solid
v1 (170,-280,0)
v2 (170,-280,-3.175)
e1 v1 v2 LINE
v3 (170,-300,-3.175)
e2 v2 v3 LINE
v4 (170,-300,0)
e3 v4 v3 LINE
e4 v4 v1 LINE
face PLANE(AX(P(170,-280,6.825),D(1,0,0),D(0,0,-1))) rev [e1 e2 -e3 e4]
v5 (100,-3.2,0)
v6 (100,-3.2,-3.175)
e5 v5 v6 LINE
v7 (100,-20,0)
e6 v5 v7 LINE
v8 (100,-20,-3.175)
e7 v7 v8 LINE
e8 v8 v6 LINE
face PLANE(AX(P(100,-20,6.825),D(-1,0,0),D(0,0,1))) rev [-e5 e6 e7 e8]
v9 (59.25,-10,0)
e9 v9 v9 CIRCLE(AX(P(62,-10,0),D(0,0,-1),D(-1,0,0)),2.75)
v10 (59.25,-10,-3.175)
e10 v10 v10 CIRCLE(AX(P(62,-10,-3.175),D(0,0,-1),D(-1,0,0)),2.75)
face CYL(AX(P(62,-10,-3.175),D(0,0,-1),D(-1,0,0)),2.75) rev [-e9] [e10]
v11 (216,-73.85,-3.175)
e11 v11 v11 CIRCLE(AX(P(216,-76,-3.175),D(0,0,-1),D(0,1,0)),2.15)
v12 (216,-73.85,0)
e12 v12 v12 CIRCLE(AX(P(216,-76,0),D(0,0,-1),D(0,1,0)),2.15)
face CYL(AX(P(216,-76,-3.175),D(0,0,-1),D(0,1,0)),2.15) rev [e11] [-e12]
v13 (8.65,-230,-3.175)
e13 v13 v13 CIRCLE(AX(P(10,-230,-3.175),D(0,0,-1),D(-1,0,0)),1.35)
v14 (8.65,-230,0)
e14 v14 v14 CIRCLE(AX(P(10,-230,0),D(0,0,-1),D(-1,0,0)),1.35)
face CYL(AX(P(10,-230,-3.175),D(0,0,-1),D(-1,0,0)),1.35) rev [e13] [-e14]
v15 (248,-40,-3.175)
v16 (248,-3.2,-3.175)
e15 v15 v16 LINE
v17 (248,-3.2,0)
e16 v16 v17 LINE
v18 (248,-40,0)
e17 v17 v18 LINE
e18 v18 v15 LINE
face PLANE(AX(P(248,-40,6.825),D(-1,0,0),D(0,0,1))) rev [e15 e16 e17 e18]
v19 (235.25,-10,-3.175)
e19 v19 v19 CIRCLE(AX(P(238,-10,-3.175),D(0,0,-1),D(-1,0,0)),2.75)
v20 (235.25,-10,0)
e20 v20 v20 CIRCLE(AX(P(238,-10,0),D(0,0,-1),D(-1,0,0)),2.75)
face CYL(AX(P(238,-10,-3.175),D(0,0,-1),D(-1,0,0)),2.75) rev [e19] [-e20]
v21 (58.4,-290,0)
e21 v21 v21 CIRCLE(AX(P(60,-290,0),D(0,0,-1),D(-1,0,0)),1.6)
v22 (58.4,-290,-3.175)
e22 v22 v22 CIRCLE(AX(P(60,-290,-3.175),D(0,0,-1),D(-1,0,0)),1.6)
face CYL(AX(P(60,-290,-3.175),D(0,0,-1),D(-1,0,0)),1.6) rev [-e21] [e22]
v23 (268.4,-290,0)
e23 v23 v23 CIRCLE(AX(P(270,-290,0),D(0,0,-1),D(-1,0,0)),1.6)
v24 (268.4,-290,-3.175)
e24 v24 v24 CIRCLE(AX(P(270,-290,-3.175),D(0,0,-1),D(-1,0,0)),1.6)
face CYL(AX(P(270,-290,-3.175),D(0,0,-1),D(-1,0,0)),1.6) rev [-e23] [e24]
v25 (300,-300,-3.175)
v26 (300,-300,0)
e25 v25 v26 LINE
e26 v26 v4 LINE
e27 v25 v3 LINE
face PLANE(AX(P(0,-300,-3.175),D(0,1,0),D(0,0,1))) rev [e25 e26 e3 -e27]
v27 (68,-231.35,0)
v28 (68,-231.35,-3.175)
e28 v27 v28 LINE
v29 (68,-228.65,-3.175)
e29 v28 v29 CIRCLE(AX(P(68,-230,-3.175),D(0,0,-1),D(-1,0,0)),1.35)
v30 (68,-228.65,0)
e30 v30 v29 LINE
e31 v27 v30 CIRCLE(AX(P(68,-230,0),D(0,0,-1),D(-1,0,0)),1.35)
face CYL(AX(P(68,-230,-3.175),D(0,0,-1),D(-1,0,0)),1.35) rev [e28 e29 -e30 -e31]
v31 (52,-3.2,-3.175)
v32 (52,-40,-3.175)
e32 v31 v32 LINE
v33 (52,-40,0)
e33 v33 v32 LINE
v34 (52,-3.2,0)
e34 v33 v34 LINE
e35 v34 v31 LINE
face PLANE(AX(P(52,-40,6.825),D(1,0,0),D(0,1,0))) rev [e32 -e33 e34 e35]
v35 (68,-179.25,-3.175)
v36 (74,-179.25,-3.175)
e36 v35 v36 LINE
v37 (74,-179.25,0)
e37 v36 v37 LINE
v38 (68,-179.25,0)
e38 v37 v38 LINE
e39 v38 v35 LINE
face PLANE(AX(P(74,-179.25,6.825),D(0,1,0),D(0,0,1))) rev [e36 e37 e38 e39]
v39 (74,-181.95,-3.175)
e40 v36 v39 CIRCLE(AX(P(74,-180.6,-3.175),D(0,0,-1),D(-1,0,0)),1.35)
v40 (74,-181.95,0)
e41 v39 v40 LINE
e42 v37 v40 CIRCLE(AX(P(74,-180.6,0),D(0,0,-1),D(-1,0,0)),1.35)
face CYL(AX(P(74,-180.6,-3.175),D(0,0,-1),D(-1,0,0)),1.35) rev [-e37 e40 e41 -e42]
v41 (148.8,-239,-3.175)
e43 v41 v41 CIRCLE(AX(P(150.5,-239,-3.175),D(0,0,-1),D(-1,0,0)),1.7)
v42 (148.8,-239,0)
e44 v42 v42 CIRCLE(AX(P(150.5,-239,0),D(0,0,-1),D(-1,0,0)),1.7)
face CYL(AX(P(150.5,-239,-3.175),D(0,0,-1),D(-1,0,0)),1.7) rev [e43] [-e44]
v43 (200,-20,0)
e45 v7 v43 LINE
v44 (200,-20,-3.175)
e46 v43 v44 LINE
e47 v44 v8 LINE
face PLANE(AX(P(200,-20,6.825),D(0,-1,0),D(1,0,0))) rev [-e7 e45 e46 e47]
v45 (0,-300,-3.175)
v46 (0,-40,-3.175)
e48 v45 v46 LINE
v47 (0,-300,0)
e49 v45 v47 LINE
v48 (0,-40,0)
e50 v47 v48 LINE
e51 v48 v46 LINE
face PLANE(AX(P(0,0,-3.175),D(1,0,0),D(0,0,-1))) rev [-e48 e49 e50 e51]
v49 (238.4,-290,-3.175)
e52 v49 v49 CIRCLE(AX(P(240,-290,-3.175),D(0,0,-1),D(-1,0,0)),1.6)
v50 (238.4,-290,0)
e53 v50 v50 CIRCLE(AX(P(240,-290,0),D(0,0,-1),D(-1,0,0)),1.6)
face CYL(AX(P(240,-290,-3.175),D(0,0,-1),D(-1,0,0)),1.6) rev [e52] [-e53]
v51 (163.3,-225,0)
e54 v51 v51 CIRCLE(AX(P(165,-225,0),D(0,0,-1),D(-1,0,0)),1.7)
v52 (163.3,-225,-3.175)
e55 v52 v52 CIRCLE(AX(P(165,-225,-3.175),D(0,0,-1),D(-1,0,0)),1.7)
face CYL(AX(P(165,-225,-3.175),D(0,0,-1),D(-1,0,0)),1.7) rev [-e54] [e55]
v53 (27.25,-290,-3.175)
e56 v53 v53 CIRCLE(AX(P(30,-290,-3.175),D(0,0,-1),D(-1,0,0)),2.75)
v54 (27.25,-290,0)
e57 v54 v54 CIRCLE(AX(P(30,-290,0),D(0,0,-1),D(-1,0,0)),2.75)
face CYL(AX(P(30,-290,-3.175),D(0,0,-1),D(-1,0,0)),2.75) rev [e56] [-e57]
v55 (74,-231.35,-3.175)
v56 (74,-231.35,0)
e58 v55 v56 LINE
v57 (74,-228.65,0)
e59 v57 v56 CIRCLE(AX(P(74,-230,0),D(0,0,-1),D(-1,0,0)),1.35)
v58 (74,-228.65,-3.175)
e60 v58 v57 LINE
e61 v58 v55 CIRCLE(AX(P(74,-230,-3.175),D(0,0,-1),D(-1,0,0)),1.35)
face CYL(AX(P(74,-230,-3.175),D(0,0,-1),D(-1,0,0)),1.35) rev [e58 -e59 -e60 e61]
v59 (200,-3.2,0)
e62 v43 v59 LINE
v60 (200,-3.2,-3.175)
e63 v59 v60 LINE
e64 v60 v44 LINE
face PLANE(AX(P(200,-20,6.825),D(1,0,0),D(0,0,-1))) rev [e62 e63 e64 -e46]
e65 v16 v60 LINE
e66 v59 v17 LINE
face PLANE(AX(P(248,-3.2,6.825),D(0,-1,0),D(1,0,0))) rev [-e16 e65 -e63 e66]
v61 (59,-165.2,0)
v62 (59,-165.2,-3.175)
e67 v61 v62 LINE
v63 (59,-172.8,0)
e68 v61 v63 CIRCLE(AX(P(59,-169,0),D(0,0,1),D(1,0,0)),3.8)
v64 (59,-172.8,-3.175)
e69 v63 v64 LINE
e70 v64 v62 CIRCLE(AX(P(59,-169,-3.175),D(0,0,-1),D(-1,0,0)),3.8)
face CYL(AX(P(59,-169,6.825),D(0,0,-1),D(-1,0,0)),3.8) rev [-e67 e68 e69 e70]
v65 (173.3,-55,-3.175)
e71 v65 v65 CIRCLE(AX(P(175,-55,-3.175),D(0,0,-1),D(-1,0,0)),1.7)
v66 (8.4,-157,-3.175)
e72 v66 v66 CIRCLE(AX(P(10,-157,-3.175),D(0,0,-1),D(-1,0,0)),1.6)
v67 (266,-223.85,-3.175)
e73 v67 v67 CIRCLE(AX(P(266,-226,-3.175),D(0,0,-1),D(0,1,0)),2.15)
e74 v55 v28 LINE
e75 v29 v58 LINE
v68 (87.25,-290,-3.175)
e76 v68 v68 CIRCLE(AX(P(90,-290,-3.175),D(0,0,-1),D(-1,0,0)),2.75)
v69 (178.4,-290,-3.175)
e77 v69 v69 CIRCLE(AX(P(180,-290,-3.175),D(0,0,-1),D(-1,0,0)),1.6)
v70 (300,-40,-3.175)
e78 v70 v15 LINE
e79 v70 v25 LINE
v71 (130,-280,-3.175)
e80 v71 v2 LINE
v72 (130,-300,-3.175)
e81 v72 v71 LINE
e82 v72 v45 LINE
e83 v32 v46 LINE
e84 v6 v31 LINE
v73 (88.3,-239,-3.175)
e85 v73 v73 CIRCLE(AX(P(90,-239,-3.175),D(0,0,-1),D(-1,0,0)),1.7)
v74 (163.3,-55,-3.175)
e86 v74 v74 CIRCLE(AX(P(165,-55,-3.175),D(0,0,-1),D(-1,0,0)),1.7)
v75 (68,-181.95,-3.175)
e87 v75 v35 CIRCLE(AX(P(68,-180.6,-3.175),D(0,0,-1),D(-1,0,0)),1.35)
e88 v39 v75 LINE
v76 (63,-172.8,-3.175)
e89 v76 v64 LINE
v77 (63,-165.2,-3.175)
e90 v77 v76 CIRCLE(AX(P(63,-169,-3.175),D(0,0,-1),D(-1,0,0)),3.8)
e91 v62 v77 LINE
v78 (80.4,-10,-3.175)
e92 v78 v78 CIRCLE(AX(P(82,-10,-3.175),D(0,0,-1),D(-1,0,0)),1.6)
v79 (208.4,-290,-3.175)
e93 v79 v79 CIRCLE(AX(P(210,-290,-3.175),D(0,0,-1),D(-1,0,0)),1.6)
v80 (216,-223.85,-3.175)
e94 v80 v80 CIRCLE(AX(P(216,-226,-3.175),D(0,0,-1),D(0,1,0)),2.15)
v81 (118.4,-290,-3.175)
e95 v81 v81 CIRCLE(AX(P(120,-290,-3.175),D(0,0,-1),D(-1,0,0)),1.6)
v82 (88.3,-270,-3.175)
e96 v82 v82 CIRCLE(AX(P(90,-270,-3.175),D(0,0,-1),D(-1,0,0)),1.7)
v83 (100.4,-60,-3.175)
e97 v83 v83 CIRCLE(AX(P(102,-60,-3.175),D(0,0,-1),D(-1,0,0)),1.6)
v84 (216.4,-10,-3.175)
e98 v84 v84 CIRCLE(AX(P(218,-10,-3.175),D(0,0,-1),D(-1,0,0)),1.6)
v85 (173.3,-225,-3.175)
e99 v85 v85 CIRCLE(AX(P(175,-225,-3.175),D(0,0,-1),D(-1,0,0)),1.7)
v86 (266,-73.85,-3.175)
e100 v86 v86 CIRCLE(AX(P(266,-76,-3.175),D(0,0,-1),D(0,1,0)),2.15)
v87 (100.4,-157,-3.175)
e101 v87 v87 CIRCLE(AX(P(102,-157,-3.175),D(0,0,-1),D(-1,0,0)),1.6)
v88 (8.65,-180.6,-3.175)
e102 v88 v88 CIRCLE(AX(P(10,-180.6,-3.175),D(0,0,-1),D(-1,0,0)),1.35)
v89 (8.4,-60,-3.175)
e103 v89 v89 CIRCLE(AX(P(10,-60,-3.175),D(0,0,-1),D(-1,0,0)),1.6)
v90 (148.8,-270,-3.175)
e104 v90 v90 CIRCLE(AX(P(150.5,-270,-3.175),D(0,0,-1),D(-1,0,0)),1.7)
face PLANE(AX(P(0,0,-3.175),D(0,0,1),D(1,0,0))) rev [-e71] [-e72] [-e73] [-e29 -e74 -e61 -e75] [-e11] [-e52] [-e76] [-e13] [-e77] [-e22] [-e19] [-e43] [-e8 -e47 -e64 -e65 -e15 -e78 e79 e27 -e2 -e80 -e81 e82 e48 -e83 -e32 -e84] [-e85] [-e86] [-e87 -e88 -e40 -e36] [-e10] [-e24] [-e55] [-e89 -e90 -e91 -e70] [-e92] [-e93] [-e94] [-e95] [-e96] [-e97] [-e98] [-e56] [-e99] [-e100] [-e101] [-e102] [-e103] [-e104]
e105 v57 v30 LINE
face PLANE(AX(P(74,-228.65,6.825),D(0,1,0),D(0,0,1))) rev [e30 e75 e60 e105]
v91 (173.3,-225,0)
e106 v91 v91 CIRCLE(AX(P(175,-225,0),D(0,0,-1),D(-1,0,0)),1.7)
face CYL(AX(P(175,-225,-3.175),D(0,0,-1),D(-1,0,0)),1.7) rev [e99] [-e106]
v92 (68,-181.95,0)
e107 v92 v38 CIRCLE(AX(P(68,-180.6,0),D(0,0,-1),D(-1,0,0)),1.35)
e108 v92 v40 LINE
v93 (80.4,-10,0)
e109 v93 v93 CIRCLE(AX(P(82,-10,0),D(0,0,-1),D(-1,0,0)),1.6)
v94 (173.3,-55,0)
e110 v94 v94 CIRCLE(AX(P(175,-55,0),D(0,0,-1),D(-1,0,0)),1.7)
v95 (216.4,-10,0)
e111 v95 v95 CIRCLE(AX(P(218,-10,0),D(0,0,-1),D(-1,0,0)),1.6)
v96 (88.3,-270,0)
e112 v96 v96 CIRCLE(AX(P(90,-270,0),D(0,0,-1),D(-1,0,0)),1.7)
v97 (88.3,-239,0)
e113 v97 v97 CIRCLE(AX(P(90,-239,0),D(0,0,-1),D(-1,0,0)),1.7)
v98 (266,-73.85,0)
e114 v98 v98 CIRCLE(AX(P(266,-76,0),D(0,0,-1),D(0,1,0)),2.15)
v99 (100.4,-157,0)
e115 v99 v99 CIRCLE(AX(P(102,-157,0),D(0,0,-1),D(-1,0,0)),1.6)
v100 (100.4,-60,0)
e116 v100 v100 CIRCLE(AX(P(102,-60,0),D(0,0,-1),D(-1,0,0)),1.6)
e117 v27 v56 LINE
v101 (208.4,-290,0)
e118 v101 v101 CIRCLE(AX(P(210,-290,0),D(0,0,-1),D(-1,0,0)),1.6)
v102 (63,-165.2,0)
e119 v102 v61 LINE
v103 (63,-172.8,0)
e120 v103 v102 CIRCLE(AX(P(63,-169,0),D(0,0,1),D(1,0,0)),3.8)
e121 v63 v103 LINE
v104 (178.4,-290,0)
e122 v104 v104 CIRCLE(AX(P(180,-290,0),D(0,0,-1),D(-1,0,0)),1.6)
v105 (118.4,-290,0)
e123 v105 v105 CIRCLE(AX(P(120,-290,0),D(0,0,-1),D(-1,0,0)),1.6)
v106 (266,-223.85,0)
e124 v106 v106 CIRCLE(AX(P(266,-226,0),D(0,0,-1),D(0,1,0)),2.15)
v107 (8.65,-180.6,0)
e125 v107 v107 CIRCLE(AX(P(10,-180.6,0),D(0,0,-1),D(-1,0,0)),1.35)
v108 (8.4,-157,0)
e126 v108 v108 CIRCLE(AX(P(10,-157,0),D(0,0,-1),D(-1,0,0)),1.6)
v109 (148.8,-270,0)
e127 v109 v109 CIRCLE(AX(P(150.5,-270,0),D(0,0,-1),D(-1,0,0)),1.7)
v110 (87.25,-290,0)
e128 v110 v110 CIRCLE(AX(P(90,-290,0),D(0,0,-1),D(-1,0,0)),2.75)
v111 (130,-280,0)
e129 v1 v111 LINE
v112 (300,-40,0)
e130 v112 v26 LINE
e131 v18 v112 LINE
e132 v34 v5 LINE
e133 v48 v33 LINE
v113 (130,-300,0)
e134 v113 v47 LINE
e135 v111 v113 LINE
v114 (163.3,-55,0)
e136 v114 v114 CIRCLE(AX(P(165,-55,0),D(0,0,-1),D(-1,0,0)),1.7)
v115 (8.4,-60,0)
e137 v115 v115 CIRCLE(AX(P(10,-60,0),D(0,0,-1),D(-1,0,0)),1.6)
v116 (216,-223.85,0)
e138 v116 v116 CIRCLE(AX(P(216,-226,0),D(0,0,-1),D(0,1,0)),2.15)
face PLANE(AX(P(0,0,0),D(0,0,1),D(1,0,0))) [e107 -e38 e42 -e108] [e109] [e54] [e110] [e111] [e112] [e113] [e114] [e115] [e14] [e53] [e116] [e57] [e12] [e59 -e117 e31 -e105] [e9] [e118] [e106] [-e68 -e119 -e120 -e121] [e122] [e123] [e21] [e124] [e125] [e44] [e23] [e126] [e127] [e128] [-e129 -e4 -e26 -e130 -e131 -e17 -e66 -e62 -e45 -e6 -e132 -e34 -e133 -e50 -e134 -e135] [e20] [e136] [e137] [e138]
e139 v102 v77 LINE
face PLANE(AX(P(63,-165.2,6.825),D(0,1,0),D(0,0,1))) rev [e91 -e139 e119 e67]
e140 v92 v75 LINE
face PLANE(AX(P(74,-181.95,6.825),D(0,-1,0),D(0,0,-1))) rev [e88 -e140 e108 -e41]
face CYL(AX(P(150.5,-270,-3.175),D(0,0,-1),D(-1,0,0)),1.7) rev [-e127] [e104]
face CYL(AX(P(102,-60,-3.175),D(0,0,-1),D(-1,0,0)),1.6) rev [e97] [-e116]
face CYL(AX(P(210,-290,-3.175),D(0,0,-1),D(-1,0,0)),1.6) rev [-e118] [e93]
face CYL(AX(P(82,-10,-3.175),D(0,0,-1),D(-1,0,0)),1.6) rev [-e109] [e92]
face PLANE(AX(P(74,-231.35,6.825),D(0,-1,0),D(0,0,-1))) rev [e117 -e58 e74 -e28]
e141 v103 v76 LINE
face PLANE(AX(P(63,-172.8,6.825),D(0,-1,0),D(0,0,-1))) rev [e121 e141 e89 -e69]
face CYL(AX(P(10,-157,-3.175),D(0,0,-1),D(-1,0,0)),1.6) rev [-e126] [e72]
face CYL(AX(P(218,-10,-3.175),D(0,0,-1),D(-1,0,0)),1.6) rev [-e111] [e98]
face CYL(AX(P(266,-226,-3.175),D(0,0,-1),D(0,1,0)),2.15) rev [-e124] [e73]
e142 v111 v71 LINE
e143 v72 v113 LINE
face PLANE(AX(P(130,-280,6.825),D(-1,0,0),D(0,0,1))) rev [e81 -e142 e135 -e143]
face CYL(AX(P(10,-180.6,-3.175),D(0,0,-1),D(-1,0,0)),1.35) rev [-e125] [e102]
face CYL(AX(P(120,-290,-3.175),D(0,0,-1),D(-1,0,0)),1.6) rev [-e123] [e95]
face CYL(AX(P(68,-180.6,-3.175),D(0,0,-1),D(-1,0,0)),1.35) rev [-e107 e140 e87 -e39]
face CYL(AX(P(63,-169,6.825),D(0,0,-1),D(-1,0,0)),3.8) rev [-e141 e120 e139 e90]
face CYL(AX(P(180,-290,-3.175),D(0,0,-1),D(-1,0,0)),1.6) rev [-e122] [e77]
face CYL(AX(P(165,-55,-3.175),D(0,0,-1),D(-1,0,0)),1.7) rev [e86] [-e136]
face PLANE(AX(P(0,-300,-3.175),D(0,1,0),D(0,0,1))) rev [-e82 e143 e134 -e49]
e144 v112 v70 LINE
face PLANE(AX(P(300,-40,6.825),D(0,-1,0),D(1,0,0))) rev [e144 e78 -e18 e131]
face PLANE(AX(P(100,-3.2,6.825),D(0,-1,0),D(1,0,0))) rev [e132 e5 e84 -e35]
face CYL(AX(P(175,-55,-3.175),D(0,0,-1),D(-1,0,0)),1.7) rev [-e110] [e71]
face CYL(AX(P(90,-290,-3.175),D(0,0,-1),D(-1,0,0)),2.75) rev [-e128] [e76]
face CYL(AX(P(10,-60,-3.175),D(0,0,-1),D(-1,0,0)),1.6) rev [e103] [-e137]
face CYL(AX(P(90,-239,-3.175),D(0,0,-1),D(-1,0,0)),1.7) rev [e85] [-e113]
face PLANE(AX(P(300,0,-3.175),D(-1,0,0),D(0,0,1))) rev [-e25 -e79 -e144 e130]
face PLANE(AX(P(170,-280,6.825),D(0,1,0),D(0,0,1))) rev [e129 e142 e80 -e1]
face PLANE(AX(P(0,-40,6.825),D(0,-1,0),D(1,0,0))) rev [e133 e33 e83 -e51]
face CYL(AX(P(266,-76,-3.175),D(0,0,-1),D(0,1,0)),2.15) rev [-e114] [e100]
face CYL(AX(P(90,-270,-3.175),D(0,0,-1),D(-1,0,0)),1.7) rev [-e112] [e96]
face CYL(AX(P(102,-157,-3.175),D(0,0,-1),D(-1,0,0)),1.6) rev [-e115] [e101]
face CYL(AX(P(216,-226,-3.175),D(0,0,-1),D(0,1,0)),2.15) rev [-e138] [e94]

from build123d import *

# Parameters (mm, degrees)
SKETCH1_W                    = 300
SKETCH1_H                    = 300
BOSS_EXTRUDE1_DEPTH          = 3.175
SKETCH2_W                    = 52
SKETCH2_H                    = 40
CUT_EXTRUDE1_DEPTH           = 10
M4_START                     = -3.175
M4_CLEARANCE_HOLE1_OUTLINE_R = 2.15
M4_CLEARANCE_HOLE1_DEPTH     = 3.175
M3_CLEARANCE_HOLE2_D         = 3.2
M2_5_CLEARANCE_HOLE1_D       = 2.7
M3_CLEARANCE_HOLE3_D         = 3.2
M3_CLEARANCE_HOLE4_D         = 3.2
CUT_EXTRUDE3_DEPTH           = 10
CUT_EXTRUDE4_DEPTH           = 10
SKETCH15_W                   = 40
SKETCH15_H                   = 20
CUT_EXTRUDE5_DEPTH           = 10
CUT_EXTRUDE6_START           = -10
CUT_EXTRUDE6_DEPTH           = 10
M3_CLEARANCE_HOLE5_D         = 3.4
M5_CLEARANCE_HOLE1_D         = 5.5
M3_CLEARANCE_HOLE7_D         = 3.4


# Read off the part's stored shape, not the designer's step: M4 Clearance Hole1
with BuildPart() as part:
    # Sketch1 → Boss-Extrude1 (new body)
    with BuildSketch(Plane(origin=(0, 0, 0), x_dir=(1, 0, 0), z_dir=(0, 0, -1))):
        with Locations((150, 150)):
            Rectangle(SKETCH1_W, SKETCH1_H)
    extrude(amount=BOSS_EXTRUDE1_DEPTH)

    # Sketch2 → Cut-Extrude1 (cut)
    with BuildSketch(Plane(origin=(0, 0, -3.175), x_dir=(1, 0, 0), z_dir=(0, 0, -1))):
        with Locations((26, 20)):
            Rectangle(SKETCH2_W, SKETCH2_H)
        with Locations((274, 20)):
            Rectangle(SKETCH2_W, SKETCH2_H)
    extrude(amount=-CUT_EXTRUDE1_DEPTH, mode=Mode.SUBTRACT)

    # M4 Clearance Hole1 outline → M4 Clearance Hole1 (cut)
    with BuildSketch(Plane.XY.offset(M4_START)):
        with Locations((266, -226)):
            Circle(M4_CLEARANCE_HOLE1_OUTLINE_R)
        with Locations((216, -76)):
            Circle(M4_CLEARANCE_HOLE1_OUTLINE_R)
        with Locations((216, -226)):
            Circle(M4_CLEARANCE_HOLE1_OUTLINE_R)
        with Locations((266, -76)):
            Circle(M4_CLEARANCE_HOLE1_OUTLINE_R)
    extrude(amount=M4_CLEARANCE_HOLE1_DEPTH, mode=Mode.SUBTRACT)

    # M3 Clearance Hole2 (through all)
    with Locations(Plane(origin=(0, 0, -3.175), x_dir=(-1, 0, 0), z_dir=(0, 0, -1))):
        with Locations((-102, -60), (-10, -157), (-102, -157), (-10, -60)):
            Hole(M3_CLEARANCE_HOLE2_D / 2)

    # M2.5 Clearance Hole1 (through all)
    with Locations(Plane(origin=(0, 0, -3.175), x_dir=(-1, 0, 0), z_dir=(0, 0, -1))):
        with Locations((-74, -180.6), (-10, -230), (-74, -230), (-10, -180.6), (-68, -230), (-68, -180.6)):
            Hole(M2_5_CLEARANCE_HOLE1_D / 2)

    # M3 Clearance Hole3 (through all)
    with Locations(Plane(origin=(0, 0, -3.175), x_dir=(-1, 0, 0), z_dir=(0, 0, -1))):
        with Locations((-30, -290), (-270, -290), (-240, -290), (-210, -290), (-180, -290), (-150, -290), (-120, -290), (-90, -290), (-60, -290)):
            Hole(M3_CLEARANCE_HOLE3_D / 2)

    # M3 Clearance Hole4 (through all)
    with Locations(Plane(origin=(0, 0, -3.175), x_dir=(-1, 0, 0), z_dir=(0, 0, -1))):
        with Locations((-82, -10), (-238, -10), (-150, -10), (-62, -10), (-218, -10)):
            Hole(M3_CLEARANCE_HOLE4_D / 2)

    # Sketch5 → Cut-Extrude3 (cut)
    with BuildSketch(Plane(origin=(0, 0, -3.175), x_dir=(-1, 0, 0), z_dir=(0, 0, -1))):
        Polygon((-248, 0), (-52, 0), (-52, -3.2), (-100, -3.2), (-100, -20), (-200, -20), (-200, -3.2), (-248, -3.2), align=None)
    extrude(amount=-CUT_EXTRUDE3_DEPTH, mode=Mode.SUBTRACT)

    # Sketch14 → Cut-Extrude4 (cut)
    with BuildSketch(Plane(origin=(0, 0, -3.175), x_dir=(-1, 0, 0), z_dir=(0, 0, -1))):
        with BuildLine():
            Line((-63, -165.2), (-59, -165.2))
            ThreePointArc((-59, -165.2), (-55.2, -169), (-59, -172.8))
            Line((-59, -172.8), (-63, -172.8))
            ThreePointArc((-63, -172.8), (-66.8, -169), (-63, -165.2))
        make_face()
    extrude(amount=-CUT_EXTRUDE4_DEPTH, mode=Mode.SUBTRACT)

    # Sketch15 → Cut-Extrude5 (cut)
    with BuildSketch(Plane(origin=(0, 0, -3.175), x_dir=(-1, 0, 0), z_dir=(0, 0, -1))):
        with Locations((-150, -290)):
            Rectangle(SKETCH15_W, SKETCH15_H)
    extrude(amount=-CUT_EXTRUDE5_DEPTH, mode=Mode.SUBTRACT)

    # Sketch16 → Cut-Extrude6 (cut)
    with BuildSketch(Plane(origin=(0, 0, -3.175), x_dir=(-1, 0, 0), z_dir=(0, 0, -1)).offset(CUT_EXTRUDE6_START)):
        with BuildLine():
            Line((-74, -179.25), (-68, -179.25))
            ThreePointArc((-68, -179.25), (-66.65, -180.6), (-68, -181.95))
            Line((-68, -181.95), (-74, -181.95))
            ThreePointArc((-74, -181.95), (-75.35, -180.6), (-74, -179.25))
        make_face()
        with BuildLine():
            Line((-74, -228.65), (-68, -228.65))
            ThreePointArc((-68, -228.65), (-66.65, -230), (-68, -231.35))
            Line((-68, -231.35), (-74, -231.35))
            ThreePointArc((-74, -231.35), (-75.35, -230), (-74, -228.65))
        make_face()
    extrude(amount=CUT_EXTRUDE6_DEPTH, mode=Mode.SUBTRACT)

    # M3 Clearance Hole5 (through all)
    with Locations(Plane(origin=(0, 0, -3.175), x_dir=(-1, 0, 0), z_dir=(0, 0, -1))):
        with Locations((-175, -55), (-165, -225), (-175, -225), (-165, -55)):
            Hole(M3_CLEARANCE_HOLE5_D / 2)

    # M5 Clearance Hole1 (through all)
    with Locations(Plane(origin=(0, 0, -3.175), x_dir=(-1, 0, 0), z_dir=(0, 0, -1))):
        with Locations((-62, -10), (-90, -290), (-30, -290), (-238, -10)):
            Hole(M5_CLEARANCE_HOLE1_D / 2)

    # M3 Clearance Hole7 (through all)
    with Locations(Plane(origin=(0, 0, -3.175), x_dir=(-1, 0, 0), z_dir=(0, 0, -1))):
        with Locations((-150.5, -239), (-90, -270), (-150.5, -270), (-90, -239)):
            Hole(M3_CLEARANCE_HOLE7_D / 2)


solid = part.part
